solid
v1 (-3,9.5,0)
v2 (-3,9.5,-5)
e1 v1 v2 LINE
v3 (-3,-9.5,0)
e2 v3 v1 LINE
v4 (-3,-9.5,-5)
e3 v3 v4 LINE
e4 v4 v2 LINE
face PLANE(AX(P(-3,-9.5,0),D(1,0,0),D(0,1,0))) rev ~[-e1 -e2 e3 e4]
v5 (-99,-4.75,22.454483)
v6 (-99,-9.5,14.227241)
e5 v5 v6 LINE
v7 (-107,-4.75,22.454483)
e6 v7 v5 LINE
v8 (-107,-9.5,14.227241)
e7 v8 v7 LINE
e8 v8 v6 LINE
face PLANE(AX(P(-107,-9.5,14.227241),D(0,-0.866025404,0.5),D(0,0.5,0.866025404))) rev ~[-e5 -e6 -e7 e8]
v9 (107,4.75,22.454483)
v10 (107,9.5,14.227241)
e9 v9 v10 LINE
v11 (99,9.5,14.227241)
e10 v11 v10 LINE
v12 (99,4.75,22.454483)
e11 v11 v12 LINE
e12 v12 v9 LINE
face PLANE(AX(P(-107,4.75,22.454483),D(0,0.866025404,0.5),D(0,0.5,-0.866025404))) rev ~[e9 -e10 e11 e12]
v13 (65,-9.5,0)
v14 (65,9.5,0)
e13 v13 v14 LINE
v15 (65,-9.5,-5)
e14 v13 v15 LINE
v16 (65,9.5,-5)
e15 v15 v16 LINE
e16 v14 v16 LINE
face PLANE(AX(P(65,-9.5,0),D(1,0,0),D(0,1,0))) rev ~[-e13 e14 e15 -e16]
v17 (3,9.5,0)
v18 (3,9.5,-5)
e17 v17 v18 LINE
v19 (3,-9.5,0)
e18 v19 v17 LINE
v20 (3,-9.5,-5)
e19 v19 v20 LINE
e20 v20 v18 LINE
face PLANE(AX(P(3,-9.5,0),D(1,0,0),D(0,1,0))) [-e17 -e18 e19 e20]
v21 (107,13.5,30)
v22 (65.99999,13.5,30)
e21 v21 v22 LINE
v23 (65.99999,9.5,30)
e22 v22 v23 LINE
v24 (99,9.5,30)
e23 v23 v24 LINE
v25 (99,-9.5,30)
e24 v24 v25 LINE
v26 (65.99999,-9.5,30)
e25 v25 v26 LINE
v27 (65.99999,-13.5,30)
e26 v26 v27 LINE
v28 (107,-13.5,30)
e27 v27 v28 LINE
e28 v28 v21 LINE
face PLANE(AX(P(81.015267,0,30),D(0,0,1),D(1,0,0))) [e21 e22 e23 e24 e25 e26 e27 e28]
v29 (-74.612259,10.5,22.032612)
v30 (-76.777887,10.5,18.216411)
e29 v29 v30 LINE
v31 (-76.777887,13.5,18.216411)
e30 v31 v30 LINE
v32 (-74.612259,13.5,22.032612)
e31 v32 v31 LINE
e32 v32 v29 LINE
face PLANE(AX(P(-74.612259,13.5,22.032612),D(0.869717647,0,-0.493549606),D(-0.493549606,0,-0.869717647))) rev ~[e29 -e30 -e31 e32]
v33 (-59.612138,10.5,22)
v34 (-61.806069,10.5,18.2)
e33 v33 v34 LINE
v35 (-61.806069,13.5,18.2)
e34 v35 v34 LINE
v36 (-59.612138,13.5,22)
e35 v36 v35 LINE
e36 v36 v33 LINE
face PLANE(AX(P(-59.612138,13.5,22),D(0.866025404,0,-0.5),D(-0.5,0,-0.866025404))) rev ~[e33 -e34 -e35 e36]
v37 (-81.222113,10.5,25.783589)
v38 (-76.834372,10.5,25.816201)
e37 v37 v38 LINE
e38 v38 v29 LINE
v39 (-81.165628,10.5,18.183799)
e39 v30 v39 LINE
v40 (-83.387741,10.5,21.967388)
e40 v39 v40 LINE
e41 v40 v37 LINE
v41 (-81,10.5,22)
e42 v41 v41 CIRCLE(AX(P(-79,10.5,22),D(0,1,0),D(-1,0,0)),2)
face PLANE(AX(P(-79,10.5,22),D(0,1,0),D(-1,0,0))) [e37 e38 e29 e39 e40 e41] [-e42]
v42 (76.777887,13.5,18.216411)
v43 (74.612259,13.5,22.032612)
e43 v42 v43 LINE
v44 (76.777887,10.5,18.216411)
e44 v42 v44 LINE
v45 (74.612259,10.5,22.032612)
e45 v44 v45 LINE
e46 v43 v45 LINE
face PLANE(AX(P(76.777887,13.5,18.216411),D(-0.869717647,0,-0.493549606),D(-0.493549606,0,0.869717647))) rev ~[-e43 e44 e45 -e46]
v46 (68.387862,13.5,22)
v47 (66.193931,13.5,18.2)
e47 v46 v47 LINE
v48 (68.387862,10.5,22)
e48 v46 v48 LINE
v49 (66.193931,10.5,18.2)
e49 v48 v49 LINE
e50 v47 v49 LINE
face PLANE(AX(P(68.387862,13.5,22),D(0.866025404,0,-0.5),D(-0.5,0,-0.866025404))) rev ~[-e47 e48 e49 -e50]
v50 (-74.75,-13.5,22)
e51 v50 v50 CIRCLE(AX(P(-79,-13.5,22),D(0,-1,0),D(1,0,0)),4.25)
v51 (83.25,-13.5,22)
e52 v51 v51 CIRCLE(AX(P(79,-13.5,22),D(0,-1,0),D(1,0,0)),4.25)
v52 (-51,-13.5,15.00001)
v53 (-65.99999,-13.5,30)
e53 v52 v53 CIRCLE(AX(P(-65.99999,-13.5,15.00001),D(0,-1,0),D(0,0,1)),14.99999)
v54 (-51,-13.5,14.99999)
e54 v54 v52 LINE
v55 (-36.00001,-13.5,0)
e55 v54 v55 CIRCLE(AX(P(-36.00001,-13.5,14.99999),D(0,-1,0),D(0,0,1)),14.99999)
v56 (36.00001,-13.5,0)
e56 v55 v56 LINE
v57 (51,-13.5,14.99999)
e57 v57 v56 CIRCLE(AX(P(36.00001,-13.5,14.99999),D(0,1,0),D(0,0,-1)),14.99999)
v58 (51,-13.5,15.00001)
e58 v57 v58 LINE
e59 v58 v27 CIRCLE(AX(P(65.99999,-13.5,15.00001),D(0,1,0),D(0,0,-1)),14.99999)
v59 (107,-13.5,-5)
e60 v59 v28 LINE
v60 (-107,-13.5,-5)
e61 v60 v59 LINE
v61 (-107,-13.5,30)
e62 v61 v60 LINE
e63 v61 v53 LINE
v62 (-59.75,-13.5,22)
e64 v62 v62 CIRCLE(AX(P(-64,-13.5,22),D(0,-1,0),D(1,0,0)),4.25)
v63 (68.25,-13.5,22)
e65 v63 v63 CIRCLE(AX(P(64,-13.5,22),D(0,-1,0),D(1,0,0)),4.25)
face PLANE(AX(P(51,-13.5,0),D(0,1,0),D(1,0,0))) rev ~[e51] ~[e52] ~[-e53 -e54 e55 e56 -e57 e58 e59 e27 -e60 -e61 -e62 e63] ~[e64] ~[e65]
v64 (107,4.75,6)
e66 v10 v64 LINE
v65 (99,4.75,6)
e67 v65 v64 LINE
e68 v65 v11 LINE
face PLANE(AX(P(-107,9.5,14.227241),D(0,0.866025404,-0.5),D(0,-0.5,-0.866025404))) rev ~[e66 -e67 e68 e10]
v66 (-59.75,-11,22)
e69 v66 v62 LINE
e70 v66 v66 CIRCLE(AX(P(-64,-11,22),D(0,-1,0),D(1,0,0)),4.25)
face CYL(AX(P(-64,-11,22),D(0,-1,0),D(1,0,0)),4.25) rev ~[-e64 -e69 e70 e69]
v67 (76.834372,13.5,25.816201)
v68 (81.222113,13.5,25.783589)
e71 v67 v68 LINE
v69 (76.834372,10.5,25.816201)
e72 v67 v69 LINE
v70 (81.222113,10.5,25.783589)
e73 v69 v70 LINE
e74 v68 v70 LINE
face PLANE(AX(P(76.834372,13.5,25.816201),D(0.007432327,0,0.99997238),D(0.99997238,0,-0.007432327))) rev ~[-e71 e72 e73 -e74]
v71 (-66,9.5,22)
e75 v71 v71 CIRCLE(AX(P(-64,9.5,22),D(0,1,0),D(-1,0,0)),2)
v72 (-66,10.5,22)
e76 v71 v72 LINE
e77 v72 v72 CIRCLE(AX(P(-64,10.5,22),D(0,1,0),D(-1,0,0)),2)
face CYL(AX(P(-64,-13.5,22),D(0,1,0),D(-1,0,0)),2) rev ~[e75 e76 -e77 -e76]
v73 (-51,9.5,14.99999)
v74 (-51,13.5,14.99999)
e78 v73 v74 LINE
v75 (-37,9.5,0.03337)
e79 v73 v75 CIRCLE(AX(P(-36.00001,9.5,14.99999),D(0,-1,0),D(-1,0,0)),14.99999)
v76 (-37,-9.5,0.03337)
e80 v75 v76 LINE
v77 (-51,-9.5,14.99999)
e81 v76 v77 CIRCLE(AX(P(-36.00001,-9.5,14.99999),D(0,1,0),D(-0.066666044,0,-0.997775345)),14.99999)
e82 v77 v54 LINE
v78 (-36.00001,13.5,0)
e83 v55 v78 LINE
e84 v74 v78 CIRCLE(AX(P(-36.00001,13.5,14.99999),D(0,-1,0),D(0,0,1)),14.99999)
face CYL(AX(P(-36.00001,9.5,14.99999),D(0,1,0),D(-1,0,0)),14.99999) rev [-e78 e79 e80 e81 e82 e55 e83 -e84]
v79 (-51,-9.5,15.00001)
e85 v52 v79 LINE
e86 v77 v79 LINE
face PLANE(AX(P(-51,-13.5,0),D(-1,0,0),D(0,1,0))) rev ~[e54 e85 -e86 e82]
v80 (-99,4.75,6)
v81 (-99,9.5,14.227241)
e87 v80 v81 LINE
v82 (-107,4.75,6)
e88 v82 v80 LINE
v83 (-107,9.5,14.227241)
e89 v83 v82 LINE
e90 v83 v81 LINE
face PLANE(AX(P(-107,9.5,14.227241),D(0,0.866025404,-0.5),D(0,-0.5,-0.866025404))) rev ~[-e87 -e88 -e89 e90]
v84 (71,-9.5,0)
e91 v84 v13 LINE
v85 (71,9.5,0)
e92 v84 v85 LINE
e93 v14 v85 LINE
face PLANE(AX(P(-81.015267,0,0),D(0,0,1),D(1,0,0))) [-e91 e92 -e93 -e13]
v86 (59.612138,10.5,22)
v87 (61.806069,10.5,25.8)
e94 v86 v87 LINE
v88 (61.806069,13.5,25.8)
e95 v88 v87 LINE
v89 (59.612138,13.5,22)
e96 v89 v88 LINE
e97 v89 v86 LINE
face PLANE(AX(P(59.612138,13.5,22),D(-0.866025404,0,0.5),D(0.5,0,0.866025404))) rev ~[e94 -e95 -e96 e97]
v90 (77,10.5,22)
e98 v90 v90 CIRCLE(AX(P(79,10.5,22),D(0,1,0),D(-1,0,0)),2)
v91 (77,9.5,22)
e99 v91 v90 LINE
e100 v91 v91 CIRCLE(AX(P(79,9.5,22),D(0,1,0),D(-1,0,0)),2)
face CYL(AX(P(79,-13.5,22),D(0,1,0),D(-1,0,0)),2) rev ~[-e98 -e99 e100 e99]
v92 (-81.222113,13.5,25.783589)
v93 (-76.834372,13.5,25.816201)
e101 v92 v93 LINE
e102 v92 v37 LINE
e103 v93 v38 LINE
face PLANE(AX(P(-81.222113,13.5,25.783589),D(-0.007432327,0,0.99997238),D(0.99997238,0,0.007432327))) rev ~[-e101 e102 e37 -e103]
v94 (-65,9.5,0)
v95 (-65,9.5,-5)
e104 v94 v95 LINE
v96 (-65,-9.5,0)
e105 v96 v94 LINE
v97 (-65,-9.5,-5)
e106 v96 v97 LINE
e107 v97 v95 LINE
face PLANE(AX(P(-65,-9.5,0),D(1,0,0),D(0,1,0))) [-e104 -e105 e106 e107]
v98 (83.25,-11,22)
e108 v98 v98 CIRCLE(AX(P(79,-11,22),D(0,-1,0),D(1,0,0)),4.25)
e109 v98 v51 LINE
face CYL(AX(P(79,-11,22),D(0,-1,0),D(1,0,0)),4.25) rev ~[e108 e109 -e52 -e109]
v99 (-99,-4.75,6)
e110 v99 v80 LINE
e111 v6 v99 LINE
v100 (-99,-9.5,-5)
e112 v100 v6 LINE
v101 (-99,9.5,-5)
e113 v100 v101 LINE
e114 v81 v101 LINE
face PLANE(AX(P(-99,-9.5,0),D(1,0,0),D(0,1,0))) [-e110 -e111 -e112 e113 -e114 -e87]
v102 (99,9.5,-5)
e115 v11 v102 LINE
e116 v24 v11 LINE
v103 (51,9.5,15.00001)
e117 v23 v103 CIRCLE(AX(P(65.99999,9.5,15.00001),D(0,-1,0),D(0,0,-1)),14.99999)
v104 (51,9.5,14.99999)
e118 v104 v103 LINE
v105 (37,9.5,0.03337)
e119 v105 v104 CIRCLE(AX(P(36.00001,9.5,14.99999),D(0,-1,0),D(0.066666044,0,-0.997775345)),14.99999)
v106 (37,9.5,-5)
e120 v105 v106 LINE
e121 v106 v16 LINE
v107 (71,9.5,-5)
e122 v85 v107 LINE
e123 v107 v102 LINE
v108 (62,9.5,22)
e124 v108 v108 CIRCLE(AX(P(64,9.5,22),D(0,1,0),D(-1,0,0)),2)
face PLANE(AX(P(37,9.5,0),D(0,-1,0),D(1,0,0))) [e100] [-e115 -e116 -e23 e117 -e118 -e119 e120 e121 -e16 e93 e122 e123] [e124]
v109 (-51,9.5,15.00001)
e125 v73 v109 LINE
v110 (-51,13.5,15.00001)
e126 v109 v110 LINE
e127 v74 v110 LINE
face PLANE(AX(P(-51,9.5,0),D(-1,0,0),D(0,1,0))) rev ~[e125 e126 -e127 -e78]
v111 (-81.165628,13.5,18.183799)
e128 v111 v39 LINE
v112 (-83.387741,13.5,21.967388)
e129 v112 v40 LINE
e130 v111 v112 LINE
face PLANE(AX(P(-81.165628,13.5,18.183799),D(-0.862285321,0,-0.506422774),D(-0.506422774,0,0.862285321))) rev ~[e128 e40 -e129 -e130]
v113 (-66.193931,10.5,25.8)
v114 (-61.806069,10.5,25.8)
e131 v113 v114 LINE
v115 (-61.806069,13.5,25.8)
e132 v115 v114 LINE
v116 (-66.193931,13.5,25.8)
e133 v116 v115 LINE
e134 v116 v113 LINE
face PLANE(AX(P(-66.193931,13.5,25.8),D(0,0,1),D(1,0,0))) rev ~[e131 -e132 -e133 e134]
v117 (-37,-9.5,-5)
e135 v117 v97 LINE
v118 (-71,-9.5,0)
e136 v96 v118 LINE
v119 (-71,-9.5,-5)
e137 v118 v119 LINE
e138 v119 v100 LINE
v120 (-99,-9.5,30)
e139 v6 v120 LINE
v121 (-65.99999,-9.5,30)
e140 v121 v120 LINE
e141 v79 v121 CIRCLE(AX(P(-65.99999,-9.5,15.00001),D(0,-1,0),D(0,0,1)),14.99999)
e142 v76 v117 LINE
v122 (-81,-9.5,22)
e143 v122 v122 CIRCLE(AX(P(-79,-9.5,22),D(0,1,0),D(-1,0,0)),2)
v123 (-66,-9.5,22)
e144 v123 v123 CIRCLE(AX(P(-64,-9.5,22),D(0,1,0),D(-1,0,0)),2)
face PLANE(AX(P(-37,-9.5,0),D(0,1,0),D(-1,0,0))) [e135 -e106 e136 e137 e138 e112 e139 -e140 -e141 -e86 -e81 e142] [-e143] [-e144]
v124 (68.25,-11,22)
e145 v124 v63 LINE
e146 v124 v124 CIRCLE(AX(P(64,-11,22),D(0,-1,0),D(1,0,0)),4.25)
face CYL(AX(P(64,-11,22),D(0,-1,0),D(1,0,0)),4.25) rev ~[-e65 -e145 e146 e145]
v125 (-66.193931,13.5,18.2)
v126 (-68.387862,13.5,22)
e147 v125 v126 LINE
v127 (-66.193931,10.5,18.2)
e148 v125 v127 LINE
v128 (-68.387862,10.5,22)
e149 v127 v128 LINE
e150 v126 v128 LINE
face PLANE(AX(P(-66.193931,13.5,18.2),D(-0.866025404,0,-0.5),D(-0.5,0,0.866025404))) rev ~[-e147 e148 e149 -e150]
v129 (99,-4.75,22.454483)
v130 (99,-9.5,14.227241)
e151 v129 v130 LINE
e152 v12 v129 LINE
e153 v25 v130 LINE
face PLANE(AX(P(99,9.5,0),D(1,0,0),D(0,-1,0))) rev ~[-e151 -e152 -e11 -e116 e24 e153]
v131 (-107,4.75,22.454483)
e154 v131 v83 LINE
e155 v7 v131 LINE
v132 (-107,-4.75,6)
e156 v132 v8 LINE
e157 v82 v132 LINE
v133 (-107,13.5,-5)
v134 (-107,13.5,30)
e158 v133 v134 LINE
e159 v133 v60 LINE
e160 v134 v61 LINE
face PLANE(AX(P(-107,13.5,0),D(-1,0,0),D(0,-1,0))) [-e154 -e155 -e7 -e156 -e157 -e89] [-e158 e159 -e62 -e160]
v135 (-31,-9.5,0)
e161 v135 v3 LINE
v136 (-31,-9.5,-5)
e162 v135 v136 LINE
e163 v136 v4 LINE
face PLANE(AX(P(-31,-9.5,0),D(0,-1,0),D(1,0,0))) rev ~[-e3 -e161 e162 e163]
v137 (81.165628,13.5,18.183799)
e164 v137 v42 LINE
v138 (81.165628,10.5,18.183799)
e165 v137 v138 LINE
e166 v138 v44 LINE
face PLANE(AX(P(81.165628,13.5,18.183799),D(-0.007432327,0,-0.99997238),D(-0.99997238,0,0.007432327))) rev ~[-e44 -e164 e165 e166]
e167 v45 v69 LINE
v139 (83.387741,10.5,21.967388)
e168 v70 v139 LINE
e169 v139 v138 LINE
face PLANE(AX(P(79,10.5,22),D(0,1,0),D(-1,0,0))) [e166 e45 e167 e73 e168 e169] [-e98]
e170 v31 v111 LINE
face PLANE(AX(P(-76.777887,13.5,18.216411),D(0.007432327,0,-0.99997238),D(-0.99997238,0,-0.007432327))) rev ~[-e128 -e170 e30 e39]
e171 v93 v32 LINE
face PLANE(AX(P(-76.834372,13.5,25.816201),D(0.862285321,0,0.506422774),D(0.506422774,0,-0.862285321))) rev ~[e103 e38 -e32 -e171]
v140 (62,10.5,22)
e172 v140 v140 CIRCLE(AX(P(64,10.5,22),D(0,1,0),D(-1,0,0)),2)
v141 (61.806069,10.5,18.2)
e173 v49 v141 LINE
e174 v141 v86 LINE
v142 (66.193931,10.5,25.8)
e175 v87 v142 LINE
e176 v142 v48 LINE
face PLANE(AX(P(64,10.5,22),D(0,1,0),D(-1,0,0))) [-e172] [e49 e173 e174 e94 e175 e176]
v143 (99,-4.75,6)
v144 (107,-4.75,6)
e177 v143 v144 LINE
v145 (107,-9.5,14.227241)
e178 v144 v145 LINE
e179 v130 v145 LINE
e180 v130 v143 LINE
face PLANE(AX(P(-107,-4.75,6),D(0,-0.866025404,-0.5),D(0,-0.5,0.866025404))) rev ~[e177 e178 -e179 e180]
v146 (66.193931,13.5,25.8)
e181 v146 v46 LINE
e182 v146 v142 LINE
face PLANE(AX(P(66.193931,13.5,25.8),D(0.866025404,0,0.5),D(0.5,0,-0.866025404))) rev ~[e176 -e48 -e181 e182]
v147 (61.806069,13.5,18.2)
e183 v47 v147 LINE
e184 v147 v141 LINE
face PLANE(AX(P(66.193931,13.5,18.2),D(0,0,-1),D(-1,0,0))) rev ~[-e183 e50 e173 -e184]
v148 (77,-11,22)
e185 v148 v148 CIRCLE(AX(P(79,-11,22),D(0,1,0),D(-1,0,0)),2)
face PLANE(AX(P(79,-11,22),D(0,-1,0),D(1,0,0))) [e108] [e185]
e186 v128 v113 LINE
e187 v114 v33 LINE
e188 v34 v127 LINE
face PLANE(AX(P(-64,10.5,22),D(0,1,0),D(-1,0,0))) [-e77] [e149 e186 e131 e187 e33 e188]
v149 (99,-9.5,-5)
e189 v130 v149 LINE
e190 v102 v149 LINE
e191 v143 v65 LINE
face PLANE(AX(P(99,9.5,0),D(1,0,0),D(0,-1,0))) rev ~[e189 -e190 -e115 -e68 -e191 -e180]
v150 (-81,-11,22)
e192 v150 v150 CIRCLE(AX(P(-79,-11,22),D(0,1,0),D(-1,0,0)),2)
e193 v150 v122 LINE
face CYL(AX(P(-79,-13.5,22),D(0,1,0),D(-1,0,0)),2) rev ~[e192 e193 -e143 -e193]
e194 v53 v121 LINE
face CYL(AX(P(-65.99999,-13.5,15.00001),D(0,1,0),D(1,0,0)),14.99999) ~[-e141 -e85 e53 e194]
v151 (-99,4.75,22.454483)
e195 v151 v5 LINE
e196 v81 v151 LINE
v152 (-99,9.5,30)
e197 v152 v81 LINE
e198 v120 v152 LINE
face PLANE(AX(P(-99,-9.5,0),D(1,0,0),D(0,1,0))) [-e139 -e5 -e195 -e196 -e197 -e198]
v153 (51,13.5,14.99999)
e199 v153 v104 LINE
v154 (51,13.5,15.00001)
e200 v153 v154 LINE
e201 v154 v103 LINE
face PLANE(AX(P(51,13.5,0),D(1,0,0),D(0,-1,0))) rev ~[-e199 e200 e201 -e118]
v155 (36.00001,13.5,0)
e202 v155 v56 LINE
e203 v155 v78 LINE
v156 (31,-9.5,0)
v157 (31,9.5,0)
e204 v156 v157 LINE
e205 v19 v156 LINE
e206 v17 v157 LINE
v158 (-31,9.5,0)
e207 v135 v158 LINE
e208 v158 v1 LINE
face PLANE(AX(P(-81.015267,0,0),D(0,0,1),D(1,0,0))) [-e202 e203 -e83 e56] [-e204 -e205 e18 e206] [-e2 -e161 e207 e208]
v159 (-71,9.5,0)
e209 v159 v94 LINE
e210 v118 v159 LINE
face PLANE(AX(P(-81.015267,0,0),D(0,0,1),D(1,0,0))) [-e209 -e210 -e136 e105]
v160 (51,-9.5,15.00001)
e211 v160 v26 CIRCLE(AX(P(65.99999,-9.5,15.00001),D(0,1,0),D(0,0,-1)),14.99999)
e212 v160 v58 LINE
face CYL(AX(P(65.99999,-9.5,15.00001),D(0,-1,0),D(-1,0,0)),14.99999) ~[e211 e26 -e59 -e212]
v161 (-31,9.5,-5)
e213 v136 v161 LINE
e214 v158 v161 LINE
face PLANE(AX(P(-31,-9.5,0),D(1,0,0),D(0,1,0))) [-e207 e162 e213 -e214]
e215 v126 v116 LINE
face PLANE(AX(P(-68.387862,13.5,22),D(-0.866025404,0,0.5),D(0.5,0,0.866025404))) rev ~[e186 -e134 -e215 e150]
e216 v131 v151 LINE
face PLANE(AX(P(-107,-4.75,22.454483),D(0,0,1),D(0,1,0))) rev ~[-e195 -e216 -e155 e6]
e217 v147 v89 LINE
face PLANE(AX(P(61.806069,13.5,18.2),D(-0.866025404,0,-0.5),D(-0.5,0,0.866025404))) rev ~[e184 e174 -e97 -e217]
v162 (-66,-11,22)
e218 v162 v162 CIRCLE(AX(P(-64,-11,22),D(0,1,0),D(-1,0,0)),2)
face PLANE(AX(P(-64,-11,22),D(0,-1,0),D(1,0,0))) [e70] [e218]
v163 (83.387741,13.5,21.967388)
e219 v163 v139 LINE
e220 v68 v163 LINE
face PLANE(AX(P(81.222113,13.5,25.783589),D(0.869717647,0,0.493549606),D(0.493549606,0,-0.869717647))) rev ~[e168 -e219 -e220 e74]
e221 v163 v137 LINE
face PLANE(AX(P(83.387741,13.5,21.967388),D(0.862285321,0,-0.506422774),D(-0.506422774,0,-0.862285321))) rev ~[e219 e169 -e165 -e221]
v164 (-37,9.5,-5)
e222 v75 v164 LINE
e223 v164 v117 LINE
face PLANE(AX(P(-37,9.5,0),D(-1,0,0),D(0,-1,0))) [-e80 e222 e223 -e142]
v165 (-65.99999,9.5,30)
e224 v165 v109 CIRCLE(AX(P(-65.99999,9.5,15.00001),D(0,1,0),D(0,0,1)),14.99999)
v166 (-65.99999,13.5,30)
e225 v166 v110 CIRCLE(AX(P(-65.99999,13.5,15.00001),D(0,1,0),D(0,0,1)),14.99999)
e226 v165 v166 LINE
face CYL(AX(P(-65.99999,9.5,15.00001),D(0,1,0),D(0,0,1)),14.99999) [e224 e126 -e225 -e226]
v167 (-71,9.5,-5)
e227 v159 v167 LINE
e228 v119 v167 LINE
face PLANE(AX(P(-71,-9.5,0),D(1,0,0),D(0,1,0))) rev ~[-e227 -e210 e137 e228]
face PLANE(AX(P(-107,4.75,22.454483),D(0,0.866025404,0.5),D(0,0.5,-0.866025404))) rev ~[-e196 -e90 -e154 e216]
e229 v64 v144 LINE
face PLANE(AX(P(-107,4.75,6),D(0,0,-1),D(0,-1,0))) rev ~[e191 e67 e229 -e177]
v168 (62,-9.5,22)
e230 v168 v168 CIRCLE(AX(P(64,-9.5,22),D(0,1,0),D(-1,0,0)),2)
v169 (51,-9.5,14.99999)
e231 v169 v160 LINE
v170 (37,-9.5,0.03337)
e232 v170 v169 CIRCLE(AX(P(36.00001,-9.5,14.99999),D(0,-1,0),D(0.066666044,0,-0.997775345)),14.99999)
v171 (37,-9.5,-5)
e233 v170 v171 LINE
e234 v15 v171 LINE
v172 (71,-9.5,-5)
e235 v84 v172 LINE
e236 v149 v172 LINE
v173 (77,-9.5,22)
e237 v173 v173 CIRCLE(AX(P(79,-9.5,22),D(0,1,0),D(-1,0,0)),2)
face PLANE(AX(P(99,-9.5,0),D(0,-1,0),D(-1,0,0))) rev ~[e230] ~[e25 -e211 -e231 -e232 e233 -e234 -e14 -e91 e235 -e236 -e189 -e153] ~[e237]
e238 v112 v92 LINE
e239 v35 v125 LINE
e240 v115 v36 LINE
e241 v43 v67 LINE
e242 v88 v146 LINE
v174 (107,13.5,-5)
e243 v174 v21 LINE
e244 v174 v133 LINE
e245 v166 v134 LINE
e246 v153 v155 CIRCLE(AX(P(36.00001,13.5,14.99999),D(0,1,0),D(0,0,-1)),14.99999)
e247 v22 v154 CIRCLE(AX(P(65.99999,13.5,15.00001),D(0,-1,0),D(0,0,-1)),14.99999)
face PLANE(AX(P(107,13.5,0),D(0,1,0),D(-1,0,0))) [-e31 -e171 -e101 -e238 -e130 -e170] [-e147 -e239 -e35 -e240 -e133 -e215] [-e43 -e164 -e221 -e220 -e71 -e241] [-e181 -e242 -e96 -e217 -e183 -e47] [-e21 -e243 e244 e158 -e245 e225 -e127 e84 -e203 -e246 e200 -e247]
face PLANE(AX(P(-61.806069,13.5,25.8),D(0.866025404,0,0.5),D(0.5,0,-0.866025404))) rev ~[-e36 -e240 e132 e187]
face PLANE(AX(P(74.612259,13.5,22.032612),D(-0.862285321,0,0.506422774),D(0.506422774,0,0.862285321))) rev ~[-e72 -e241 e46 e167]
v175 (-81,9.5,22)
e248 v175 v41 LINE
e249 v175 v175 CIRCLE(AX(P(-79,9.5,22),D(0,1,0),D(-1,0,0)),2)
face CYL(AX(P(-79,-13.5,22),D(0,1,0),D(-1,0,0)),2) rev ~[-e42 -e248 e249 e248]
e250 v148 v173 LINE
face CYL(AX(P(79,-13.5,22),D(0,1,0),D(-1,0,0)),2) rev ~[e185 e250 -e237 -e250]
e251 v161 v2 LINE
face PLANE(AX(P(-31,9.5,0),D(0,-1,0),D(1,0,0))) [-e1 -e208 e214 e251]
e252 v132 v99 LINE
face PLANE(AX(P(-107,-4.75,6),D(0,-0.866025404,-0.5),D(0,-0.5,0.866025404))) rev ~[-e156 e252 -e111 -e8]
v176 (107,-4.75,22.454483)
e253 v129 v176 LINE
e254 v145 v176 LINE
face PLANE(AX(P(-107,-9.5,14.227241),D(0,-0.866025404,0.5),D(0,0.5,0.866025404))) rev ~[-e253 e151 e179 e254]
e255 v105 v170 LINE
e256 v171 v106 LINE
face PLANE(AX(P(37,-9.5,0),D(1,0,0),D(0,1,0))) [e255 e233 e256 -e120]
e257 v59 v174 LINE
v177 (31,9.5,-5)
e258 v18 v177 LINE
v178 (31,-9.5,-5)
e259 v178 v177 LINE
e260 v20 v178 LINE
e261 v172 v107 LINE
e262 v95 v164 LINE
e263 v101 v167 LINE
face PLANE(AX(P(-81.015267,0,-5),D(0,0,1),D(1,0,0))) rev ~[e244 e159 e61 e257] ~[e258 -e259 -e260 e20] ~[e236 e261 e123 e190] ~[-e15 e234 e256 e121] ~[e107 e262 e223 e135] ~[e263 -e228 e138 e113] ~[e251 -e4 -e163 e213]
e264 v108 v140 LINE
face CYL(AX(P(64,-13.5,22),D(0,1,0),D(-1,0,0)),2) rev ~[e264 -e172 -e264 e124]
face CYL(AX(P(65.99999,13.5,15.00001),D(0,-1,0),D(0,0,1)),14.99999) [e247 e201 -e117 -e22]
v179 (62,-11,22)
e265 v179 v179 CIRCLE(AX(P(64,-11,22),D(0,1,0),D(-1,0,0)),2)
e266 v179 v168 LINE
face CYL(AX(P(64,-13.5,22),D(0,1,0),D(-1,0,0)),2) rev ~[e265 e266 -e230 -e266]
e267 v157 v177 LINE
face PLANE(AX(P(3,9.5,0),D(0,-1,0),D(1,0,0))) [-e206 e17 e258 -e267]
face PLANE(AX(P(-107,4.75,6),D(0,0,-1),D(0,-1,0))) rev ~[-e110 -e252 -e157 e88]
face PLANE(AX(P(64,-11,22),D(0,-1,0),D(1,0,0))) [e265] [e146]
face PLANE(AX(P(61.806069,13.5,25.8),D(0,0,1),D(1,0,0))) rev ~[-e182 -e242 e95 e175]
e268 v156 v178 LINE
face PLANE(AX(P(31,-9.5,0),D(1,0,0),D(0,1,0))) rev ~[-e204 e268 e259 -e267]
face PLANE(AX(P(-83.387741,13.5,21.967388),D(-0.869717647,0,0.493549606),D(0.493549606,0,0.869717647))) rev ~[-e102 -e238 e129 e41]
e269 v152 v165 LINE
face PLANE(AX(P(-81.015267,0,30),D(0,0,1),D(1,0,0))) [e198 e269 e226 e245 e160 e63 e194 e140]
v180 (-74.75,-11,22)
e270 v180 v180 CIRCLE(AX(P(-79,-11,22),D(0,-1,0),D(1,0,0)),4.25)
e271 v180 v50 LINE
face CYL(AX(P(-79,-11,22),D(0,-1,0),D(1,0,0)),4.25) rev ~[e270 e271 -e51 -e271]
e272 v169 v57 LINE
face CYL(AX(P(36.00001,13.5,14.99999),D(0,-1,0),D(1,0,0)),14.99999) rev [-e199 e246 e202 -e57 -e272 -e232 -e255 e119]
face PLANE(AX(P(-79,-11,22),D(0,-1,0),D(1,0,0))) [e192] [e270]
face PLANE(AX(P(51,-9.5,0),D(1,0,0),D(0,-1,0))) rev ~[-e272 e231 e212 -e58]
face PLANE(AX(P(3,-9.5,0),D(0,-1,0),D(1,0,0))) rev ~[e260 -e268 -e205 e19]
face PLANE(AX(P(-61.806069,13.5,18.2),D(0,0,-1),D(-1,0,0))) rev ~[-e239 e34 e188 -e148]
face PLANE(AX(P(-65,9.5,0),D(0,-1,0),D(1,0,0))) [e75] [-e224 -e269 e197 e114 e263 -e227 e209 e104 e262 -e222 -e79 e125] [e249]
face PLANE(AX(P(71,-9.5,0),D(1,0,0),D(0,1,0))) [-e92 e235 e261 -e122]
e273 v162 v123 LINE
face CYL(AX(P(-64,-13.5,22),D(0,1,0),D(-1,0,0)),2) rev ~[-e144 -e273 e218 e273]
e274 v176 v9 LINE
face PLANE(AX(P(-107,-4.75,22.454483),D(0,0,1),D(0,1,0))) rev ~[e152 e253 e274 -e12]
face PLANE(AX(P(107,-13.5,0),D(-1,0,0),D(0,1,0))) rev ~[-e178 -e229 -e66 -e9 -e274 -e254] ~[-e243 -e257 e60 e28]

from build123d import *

# Parameters (mm, degrees)
F0_W           = 28
F0_H           = 19
F0_W_2         = 6
F1_DEPTH       = 5
F2_DEPTH       = 30
F3_R           = 14.99999
F6_D           = 4
F6_CBORE_D     = 8.5
F6_CBORE_DEPTH = 2.5
F7_R           = 2
F8_DEPTH       = 3
F10_DEPTH      = 214.001


# Not quite as in the source:
# - a fillet or chamfer is up to 0.001 mm smaller than in the source, because OpenCascade refuses the exact size
# - a feature names something its author has since deleted; it is built from what else it names


with BuildPart() as f1:
    # F0 (on Top) → F1 (new body)
    with BuildSketch(Plane.XY):
        Polygon((-107, 13.5), (-107, -13.5), (-51, -13.5), (-51, -9.5), (-65, -9.5), (-71, -9.5), (-99, -9.5), (-99, 9.5), (-71, 9.5), (-65, 9.5), (-51, 9.5), (-51, 13.5), align=None)
        Polygon((-51, -9.5), (-51, -13.5), (51, -13.5), (51, -9.5), (37, -9.5), (37, 9.5), (51, 9.5), (51, 13.5), (-51, 13.5), (-51, 9.5), (-37, 9.5), (-37, -9.5), align=None)
        with Locations((-17, 0)):
            Rectangle(F0_W, F0_H, mode=Mode.SUBTRACT)
        with Locations((17, 0)):
            Rectangle(F0_W, F0_H, mode=Mode.SUBTRACT)
        Polygon((51, -9.5), (51, -13.5), (107, -13.5), (107, 13.5), (51, 13.5), (51, 9.5), (65, 9.5), (71, 9.5), (99, 9.5), (99, -9.5), (71, -9.5), (65, -9.5), align=None)
        with Locations((-68, 0)):
            Rectangle(F0_W_2, F0_H)
        with Locations((68, 0)):
            Rectangle(F0_W_2, F0_H)
    extrude(amount=-F1_DEPTH)

    # F0 (on Top) → F2 (join)
    with BuildSketch(Plane.XY):
        Polygon((51, -9.5), (51, -13.5), (107, -13.5), (107, 13.5), (51, 13.5), (51, 9.5), (65, 9.5), (71, 9.5), (99, 9.5), (99, -9.5), (71, -9.5), (65, -9.5), align=None)
        Polygon((-107, 13.5), (-107, -13.5), (-51, -13.5), (-51, -9.5), (-65, -9.5), (-71, -9.5), (-99, -9.5), (-99, 9.5), (-71, 9.5), (-65, 9.5), (-51, 9.5), (-51, 13.5), align=None)
    extrude(amount=F2_DEPTH)

    # F3 (radius 15 in the source; OpenCascade refuses exactly that, so slightly less here)
    f3_edges = [f1.edges().sort_by_distance(p)[0] for p in [
        (51, 11.5, 0),
        (51, 11.5, 30),
        (-51, 11.5, 30),
        (-51, 11.5, 0),
        (-51, -11.5, 30),
        (51, -11.5, 30),
    ]]
    fillet(f3_edges, radius=F3_R)

    # F6 (through all)
    with Locations(Plane.XZ.offset(13.5)):
        with Locations((-79, 22), (79, 22), (-64, 22), (64, 22)):
            CounterBoreHole(F6_D / 2, F6_CBORE_D / 2, F6_CBORE_DEPTH)

    # F7 (on face) → F8 (cut)
    with BuildSketch(Plane(origin=(0, 13.5, 0), x_dir=(-1, 0, 0), z_dir=(0, 1, 0))):
        Polygon((-81.1656275844, 18.1837989441), (-76.7778867319, 18.2164109688), (-74.6122591474, 22.0326120247), (-76.8343724156, 25.8162010559), (-81.2221132681, 25.7835890312), (-83.3877408526, 21.9673879753), align=None)
        with Locations((-79, 22)):
            Circle(F7_R, mode=Mode.SUBTRACT)
        Polygon((-59.6121379542, 22), (-61.8060689771, 25.8), (-66.1939310229, 25.8), (-68.3878620458, 22), (-66.1939310229, 18.2), (-61.8060689771, 18.2), align=None)
        with Locations((-64, 22)):
            Circle(F7_R, mode=Mode.SUBTRACT)
        Polygon((61.8060689771, 18.2), (66.1939310229, 18.2), (68.3878620458, 22), (66.1939310229, 25.8), (61.8060689771, 25.8), (59.6121379542, 22), align=None)
        with Locations((64, 22)):
            Circle(F7_R, mode=Mode.SUBTRACT)
        Polygon((76.7778867319, 18.2164109688), (81.1656275844, 18.1837989441), (83.3877408526, 21.9673879753), (81.2221132681, 25.7835890312), (76.8343724156, 25.8162010559), (74.6122591474, 22.0326120247), align=None)
        with Locations((79, 22)):
            Circle(F7_R, mode=Mode.SUBTRACT)
    extrude(amount=-F8_DEPTH, mode=Mode.SUBTRACT)

    # F9 (on face) → F10 (cut, through all)
    with BuildSketch(Plane(origin=(-107, 0, 0), x_dir=(0, -1, 0), z_dir=(-1, 0, 0))):
        Polygon((-4.75, 6), (4.75, 6), (9.5, 14.227241336), (4.75, 22.4544826719), (-4.75, 22.4544826719), (-9.5, 14.227241336), align=None)
    extrude(amount=-F10_DEPTH, mode=Mode.SUBTRACT)


solid = f1.part
